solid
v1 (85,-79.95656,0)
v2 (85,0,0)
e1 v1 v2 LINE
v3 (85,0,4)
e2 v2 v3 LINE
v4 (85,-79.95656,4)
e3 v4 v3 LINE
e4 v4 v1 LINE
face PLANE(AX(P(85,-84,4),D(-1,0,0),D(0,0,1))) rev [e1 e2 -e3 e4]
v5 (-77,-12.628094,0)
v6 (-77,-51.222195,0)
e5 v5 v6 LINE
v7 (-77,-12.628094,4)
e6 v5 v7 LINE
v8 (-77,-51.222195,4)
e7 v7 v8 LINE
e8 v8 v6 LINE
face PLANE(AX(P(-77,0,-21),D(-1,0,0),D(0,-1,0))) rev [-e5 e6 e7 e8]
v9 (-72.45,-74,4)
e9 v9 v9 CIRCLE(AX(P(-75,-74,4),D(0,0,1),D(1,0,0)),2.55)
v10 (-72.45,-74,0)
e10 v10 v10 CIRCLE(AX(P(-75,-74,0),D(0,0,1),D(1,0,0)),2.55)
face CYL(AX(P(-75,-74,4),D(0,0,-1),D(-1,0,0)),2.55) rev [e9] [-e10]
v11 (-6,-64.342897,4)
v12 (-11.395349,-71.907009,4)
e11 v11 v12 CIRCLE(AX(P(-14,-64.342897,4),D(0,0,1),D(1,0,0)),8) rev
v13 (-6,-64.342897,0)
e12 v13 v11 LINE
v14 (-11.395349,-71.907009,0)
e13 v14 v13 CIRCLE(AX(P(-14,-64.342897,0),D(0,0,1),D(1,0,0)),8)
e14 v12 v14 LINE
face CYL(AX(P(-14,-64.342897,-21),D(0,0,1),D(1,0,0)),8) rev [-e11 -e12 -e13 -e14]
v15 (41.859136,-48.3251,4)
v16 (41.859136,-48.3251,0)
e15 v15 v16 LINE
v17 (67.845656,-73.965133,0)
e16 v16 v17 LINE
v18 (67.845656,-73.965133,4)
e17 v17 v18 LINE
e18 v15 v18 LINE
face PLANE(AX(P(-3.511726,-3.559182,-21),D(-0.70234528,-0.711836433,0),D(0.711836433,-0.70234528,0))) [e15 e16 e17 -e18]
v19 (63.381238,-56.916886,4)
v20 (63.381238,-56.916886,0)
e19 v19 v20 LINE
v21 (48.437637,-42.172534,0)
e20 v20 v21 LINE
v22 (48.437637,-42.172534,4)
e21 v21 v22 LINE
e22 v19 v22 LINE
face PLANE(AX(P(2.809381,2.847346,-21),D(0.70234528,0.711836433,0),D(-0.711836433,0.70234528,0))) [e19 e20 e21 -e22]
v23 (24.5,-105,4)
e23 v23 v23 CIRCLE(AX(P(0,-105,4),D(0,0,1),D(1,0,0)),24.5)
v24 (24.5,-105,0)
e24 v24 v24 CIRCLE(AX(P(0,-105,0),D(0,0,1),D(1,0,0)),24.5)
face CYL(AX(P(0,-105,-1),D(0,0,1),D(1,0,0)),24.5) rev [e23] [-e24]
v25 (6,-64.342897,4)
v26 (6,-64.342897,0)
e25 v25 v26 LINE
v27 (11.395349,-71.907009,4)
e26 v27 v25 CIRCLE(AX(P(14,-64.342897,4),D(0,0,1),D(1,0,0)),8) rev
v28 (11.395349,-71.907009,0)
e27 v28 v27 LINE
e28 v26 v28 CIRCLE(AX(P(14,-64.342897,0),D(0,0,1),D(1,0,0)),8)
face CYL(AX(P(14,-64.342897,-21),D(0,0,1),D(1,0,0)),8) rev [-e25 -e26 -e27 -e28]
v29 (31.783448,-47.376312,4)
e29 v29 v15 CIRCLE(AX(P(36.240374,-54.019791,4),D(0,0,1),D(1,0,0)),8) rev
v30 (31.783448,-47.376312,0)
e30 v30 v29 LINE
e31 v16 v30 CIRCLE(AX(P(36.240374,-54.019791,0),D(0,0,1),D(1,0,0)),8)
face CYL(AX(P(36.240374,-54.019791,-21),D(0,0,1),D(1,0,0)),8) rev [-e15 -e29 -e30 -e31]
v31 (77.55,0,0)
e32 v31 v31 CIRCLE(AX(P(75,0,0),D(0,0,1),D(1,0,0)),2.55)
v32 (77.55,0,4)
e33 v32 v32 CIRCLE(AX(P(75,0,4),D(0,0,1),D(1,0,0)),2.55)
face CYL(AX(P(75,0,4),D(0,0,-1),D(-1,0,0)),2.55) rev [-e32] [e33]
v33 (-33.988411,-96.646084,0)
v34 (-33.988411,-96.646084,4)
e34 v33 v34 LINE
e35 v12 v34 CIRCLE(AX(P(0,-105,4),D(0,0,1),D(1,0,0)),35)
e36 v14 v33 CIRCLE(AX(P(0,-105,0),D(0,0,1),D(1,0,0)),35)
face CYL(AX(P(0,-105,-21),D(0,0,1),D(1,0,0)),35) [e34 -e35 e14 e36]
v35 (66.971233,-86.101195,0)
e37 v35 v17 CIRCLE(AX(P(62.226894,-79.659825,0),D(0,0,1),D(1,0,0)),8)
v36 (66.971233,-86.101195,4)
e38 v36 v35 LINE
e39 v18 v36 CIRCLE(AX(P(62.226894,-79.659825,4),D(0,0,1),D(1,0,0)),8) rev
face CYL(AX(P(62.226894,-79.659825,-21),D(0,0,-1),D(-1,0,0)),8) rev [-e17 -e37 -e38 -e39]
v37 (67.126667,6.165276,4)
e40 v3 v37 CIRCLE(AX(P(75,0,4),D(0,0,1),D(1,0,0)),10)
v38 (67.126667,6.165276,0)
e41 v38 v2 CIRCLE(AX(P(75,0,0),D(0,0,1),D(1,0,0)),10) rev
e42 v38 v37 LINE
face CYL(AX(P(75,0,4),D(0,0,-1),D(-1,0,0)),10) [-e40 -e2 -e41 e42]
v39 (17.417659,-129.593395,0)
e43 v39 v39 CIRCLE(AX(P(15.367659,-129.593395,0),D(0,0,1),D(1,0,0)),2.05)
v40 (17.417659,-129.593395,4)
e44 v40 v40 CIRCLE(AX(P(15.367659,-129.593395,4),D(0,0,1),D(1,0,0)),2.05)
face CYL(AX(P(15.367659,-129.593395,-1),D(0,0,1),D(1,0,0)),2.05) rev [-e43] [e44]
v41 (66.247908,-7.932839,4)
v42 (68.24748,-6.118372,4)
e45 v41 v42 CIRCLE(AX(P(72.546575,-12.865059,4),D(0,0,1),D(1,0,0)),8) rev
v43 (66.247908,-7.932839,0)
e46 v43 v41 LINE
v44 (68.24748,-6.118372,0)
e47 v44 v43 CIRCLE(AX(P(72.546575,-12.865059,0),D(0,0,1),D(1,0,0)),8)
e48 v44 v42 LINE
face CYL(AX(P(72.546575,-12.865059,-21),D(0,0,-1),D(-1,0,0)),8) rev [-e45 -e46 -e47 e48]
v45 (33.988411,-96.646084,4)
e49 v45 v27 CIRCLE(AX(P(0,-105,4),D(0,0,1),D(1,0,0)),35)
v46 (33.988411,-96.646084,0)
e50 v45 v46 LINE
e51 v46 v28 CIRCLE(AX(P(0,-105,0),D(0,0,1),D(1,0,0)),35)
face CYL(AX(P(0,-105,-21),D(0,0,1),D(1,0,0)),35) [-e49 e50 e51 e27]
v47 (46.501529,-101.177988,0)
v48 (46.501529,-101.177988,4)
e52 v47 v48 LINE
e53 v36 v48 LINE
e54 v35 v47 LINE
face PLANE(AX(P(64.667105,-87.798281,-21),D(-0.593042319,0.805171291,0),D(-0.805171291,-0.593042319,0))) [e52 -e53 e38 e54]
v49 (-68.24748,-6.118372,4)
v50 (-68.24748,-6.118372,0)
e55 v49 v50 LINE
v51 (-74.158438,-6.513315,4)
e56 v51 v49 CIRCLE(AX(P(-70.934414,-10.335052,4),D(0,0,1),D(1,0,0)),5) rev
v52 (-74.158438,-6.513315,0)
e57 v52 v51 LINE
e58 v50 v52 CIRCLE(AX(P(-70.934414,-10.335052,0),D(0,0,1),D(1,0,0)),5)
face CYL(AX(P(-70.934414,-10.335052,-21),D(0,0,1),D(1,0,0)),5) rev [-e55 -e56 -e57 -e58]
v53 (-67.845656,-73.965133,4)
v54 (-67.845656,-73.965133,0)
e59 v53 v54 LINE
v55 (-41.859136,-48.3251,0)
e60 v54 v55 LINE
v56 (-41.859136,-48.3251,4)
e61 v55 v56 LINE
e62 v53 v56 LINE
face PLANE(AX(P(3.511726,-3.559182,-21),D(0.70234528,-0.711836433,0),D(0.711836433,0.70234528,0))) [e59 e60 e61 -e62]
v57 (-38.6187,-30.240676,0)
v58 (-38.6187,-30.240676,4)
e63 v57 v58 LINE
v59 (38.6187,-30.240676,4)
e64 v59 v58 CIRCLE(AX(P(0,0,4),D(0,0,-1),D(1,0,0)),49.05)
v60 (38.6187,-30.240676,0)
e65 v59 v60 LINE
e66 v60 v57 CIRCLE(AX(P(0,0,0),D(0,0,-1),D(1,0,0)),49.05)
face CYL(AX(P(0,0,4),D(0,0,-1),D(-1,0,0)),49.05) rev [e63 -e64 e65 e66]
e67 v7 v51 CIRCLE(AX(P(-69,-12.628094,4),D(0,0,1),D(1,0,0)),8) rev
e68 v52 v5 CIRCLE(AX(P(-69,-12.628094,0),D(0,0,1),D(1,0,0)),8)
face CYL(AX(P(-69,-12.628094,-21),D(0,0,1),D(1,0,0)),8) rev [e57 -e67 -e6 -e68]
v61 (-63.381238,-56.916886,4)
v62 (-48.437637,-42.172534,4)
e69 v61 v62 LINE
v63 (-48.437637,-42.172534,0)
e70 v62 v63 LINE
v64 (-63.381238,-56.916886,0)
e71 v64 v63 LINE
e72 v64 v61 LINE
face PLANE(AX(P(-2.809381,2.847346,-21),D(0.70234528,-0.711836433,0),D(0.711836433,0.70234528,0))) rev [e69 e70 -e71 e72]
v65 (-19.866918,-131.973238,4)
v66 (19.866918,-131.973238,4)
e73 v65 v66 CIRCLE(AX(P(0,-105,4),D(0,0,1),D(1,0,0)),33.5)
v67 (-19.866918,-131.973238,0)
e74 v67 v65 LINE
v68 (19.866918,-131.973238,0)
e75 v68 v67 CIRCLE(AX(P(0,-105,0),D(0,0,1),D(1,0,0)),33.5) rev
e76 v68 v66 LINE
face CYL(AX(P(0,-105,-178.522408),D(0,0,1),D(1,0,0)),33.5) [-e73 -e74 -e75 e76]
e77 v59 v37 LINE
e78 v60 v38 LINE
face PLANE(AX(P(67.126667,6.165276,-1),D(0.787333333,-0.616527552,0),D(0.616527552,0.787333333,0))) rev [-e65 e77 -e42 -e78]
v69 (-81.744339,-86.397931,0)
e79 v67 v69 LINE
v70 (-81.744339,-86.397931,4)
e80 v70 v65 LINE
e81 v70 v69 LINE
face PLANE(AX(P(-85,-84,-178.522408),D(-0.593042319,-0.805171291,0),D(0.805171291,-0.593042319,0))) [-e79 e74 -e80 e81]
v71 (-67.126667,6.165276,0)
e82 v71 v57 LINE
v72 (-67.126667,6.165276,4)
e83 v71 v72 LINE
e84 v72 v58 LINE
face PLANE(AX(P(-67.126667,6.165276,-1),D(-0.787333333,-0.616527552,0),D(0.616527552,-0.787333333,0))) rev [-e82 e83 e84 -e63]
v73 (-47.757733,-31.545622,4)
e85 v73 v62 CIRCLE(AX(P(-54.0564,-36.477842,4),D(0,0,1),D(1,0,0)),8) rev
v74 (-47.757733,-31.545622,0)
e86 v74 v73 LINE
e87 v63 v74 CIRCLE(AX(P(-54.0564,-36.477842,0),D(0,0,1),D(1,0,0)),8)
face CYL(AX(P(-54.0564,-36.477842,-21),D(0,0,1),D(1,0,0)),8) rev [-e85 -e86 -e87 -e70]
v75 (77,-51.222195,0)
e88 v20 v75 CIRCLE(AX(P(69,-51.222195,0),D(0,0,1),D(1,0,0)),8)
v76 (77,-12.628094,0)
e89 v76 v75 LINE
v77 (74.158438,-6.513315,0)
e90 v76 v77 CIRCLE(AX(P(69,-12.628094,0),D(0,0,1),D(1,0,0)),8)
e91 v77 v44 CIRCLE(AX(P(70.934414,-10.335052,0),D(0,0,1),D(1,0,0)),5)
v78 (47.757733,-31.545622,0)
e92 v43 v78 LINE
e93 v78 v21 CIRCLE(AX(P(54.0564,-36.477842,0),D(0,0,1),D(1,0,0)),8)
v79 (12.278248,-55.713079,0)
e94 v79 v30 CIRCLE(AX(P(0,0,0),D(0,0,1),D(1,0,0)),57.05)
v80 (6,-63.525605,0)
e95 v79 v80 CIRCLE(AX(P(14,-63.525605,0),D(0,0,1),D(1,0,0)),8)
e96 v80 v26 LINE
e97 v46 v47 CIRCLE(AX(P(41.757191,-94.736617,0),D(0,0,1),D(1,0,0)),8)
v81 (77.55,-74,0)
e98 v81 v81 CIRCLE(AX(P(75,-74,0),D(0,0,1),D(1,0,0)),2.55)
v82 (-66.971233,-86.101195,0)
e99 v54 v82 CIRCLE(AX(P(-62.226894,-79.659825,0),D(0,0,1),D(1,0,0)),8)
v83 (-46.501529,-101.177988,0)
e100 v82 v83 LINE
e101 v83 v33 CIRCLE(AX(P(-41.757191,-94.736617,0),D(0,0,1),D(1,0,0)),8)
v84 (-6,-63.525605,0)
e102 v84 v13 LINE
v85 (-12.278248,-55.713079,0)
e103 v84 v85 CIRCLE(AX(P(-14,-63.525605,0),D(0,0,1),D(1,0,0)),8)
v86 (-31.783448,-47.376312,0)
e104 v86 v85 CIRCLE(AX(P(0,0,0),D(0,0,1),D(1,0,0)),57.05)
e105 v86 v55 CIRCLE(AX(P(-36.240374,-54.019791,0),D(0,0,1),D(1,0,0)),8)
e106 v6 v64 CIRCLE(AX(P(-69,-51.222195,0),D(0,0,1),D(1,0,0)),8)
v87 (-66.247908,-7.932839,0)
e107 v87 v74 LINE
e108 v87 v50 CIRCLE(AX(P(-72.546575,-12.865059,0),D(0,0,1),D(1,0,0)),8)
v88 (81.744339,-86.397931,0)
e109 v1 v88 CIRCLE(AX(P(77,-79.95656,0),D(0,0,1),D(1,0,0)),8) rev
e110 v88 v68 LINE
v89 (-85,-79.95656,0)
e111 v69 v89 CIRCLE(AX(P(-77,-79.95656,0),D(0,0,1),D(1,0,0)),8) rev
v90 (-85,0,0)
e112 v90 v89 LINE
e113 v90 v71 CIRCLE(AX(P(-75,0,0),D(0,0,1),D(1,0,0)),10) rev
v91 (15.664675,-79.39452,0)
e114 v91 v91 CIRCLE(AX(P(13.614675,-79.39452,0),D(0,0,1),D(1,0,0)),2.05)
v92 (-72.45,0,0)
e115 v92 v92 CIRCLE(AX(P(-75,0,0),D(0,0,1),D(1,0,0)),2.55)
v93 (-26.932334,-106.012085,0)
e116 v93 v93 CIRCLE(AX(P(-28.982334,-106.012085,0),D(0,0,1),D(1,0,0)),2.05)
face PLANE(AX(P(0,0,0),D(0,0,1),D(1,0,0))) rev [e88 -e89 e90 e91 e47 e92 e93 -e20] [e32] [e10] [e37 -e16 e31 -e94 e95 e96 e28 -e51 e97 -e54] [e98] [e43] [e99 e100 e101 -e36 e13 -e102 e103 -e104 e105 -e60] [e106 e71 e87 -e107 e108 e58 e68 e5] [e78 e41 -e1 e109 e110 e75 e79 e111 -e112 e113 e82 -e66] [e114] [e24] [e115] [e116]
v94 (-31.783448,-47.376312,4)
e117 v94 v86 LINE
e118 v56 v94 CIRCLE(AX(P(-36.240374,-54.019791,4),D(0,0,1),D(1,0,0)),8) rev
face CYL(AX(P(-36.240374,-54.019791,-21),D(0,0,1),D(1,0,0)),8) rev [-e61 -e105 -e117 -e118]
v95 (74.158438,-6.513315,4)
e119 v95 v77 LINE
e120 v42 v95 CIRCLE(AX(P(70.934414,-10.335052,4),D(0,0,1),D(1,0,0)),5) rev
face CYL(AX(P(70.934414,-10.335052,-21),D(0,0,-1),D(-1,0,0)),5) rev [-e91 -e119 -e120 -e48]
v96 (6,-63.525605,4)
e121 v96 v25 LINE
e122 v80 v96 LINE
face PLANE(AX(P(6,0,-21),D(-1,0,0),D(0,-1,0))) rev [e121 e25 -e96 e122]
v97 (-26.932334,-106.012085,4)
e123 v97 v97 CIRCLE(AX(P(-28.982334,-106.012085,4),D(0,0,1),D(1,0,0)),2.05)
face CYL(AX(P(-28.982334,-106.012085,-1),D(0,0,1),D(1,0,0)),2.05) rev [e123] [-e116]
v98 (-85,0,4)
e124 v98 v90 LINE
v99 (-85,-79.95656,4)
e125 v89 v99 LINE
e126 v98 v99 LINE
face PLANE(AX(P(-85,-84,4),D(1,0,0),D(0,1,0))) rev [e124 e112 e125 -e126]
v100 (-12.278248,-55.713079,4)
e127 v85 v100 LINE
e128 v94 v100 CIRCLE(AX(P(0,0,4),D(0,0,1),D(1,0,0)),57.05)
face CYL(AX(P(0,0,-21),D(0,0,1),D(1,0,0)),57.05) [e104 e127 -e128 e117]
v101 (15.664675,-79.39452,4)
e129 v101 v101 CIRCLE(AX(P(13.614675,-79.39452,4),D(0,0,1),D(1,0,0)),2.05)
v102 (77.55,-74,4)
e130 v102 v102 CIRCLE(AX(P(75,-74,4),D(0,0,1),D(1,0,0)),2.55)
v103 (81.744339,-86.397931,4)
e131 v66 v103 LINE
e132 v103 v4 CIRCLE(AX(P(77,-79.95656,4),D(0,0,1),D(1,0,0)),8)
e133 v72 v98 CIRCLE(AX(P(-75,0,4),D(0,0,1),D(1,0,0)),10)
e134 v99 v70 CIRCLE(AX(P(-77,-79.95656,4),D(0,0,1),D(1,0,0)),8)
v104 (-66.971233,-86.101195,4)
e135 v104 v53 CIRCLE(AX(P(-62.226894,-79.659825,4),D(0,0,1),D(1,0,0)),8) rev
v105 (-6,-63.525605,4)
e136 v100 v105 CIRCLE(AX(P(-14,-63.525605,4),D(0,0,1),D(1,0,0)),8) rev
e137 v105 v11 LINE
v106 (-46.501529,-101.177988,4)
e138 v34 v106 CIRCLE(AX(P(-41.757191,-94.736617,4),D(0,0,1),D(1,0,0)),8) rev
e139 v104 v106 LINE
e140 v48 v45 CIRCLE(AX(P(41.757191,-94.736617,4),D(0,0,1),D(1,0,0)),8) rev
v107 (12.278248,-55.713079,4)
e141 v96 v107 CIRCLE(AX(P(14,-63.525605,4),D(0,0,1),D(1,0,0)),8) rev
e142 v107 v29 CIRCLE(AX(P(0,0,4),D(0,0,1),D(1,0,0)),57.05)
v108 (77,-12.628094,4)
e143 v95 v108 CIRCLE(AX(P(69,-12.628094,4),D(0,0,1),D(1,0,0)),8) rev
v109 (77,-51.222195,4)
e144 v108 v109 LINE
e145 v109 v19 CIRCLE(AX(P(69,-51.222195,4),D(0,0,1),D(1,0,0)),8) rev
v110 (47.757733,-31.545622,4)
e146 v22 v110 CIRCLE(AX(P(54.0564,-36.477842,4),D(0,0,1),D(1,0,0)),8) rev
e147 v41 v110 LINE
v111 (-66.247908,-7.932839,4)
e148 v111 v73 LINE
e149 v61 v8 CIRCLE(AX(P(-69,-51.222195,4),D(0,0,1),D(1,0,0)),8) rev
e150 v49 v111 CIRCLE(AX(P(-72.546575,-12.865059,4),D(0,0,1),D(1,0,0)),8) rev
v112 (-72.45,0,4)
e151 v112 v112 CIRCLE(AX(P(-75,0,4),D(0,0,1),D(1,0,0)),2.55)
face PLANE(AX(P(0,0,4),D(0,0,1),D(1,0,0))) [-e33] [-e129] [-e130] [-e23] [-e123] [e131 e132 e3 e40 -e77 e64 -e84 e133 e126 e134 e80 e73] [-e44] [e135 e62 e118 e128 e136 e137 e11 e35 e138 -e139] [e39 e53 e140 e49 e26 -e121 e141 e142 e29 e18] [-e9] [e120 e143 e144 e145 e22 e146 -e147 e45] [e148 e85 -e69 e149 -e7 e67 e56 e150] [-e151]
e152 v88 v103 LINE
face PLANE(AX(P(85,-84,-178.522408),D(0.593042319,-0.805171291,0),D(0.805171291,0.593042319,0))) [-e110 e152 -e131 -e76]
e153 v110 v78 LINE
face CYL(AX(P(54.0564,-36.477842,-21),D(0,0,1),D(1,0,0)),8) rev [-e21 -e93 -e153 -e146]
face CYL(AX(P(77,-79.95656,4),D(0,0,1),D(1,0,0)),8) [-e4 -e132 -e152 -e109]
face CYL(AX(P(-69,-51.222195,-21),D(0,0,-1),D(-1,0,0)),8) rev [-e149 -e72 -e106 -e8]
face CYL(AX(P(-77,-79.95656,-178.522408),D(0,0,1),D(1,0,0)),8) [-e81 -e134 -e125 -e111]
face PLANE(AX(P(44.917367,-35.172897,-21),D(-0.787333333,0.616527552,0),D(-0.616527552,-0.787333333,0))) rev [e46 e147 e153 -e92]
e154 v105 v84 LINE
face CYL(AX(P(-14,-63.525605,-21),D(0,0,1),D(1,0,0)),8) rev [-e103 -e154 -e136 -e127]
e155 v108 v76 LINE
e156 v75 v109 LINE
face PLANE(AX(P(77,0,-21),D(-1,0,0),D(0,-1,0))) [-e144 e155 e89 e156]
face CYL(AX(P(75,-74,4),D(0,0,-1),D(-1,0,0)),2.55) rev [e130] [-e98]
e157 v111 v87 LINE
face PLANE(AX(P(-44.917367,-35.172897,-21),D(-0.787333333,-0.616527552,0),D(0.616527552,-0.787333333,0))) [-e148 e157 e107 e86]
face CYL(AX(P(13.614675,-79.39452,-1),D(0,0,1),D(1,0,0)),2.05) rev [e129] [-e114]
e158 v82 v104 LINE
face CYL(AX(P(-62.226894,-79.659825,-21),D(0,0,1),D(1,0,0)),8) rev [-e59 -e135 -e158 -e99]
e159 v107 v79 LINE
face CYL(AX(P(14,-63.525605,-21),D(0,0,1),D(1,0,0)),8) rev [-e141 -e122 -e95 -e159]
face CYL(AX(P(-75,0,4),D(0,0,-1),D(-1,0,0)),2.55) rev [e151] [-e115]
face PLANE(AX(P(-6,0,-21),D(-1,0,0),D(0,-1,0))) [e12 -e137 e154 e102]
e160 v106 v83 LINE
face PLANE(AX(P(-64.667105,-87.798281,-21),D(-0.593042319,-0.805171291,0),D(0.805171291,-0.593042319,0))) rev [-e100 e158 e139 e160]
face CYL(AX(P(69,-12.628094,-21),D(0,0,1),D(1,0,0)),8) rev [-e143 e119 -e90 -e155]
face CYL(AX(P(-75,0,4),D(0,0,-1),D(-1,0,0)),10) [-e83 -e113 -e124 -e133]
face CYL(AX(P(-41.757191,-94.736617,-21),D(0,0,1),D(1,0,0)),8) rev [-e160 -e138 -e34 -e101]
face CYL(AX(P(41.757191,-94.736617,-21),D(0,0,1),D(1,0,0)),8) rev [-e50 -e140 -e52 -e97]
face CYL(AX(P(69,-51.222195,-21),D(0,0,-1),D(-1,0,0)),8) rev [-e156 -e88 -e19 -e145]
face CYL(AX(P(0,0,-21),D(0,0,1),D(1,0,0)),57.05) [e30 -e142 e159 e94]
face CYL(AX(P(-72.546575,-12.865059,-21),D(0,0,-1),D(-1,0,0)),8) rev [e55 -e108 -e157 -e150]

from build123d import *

# Parameters (mm, degrees)
SKETCH_1_R          = 2.55
EXTRUDE_1_DEPTH     = 4
EXTRUDE_2_DEPTH     = 4
FILLET_2_R          = 10
SKETCH_5_R          = 2.05
SKETCH_5_R_2        = 24.5
CUT_EXTRUDE_1_DEPTH = 5
CUT_EXTRUDE_2_DEPTH = 5
CUT_EXTRUDE_3_DEPTH = 25
FILLET_3_R          = 8
FILLET_4_R          = 5


with BuildPart() as part:
    # 草图1 → 凸台-拉伸1 (new body)
    with BuildSketch(Plane.XY):
        with BuildLine():
            Line((-85, -84), (85, -84))
            Line((85, -84), (85, 10))
            Line((85, 10), (48.019813619, 10))
            ThreePointArc((48.019813619, 10), (0, -49.05), (-48.019813619, 10))
            Line((-48.019813619, 10), (-85, 10))
            Line((-85, 10), (-85, -84))
        make_face()
        with Locations((75, 0)):
            Circle(SKETCH_1_R, mode=Mode.SUBTRACT)
        with Locations((-75, 0)):
            Circle(SKETCH_1_R, mode=Mode.SUBTRACT)
        with Locations((-75, -74)):
            Circle(SKETCH_1_R, mode=Mode.SUBTRACT)
        with Locations((75, -74)):
            Circle(SKETCH_1_R, mode=Mode.SUBTRACT)
    extrude(amount=EXTRUDE_1_DEPTH)

    # 草图2 → 凸台-拉伸2 (add)
    with BuildSketch(Plane.XY.offset(4)):
        with BuildLine():
            Line((-85, -84), (-19.866917685, -131.97323825))
            ThreePointArc((-19.866917685, -131.97323825), (0, -138.5), (19.866917685, -131.97323825))
            Line((19.866917685, -131.97323825), (85, -84))
            Line((85, -84), (-85, -84))
        make_face()
    extrude(amount=-EXTRUDE_2_DEPTH)

    # 圆角2
    fillet_2_edges = [part.edges().sort_by_distance(p)[0] for p in [
        (85, 10, 2),
        (-85, 10, 2),
    ]]
    fillet(fillet_2_edges, radius=FILLET_2_R)

    # 草图5 → 切除-拉伸1 (cut)
    with BuildSketch(Plane.XY.offset(4)):
        with Locations((15.367658663, -129.593394789)):
            Circle(SKETCH_5_R)
        with Locations((-28.982333984, -106.012085404)):
            Circle(SKETCH_5_R)
        with Locations((13.614675321, -79.394519807)):
            Circle(SKETCH_5_R)
        with Locations((0, -105)):
            Circle(SKETCH_5_R_2)
    extrude(amount=-CUT_EXTRUDE_1_DEPTH, mode=Mode.SUBTRACT)

    # 草图6 → 切除-拉伸2 (cut)
    with BuildSketch(Plane.XY.offset(4)):
        with BuildLine():
            Line((-67.126666667, 6.165275519), (-38.6187, -30.24067642))
            Line((-38.6187, -30.24067642), (38.6187, -30.24067642))
            Line((38.6187, -30.24067642), (67.126666667, 6.165275519))
            ThreePointArc((67.126666667, 6.165275519), (70.621230492, 8.990349136), (75, 10))
            Line((75, 10), (-75, 10))
            ThreePointArc((-75, 10), (-70.621230492, 8.990349136), (-67.126666667, 6.165275519))
        make_face()
    extrude(amount=-CUT_EXTRUDE_2_DEPTH, mode=Mode.SUBTRACT)

    # 草图7 → 切除-拉伸3 (cut)
    with BuildSketch(Plane.XY.offset(4)):
        Polygon((-77, -5.144778907), (-68.857155974, -4.600712255), (-43.359613768, -37.162217147), (-77, -70.354064895), align=None)
        with BuildLine():
            ThreePointArc((-36.942273764, -43.473795661), (-22.471434931, -52.437935811), (-6, -56.733609968))
            Line((-6, -56.733609968), (-6, -70.518120701))
            ThreePointArc((-6, -70.518120701), (-28.302069217, -84.408912655), (-34.654792832, -109.903604165))
            Line((-34.654792832, -109.903604165), (-74.514618659, -80.545175958))
            Line((-74.514618659, -80.545175958), (-36.942273764, -43.473795661))
        make_face()
        with BuildLine():
            ThreePointArc((34.654792832, -109.903604165), (28.302069217, -84.408912655), (6, -70.518120701))
            Line((6, -70.518120701), (6, -56.733609968))
            ThreePointArc((6, -56.733609968), (22.471434931, -52.437935811), (36.942273764, -43.473795661))
            Line((36.942273764, -43.473795661), (74.514618659, -80.545175958))
            Line((74.514618659, -80.545175958), (34.654792832, -109.903604165))
        make_face()
        Polygon((77, -70.354064895), (43.359613768, -37.162217147), (68.857155974, -4.600712255), (77, -5.144778907), align=None)
    extrude(amount=-CUT_EXTRUDE_3_DEPTH, mode=Mode.SUBTRACT)

    # 圆角3
    # the kernel refuses this fillet: 8 mm, written as the material it adds along each edge
    with BuildSketch(Plane(origin=(-6, -56.733609968, 4), x_dir=(0, -1, 0), z_dir=(0, 0, -1))) as fillet_3_piece_1:
        with BuildLine():
            CenterArc((6.791995106, 8), FILLET_3_R, 192.428379519, 77.571620481)
            ThreePointArc((-1.020531268, 6.278247502), (-0.422700314, 3.153357523), (0, 0))
            Line((0, 0), (6.791995106, 0))
        make_face()
    extrude(amount=4)
    with BuildSketch(Plane(origin=(-6, -70.518120701, 4), x_dir=(-0.9684273836136271, -0.2492958135774943, 0), z_dir=(0, 0, -1))) as fillet_3_piece_2:
        with BuildLine():
            CenterArc((6.207961727, 7.97462195), FILLET_3_R, 194.435845985, 70.999197637)
            Line((-1.539457342, 5.980255442), (0, 0))
            ThreePointArc((0, 0), (2.785623852, 0.111028967), (5.571247704, 0))
        make_face()
    extrude(amount=4)
    with BuildSketch(Plane(origin=(-34.654792832, -109.903604165, 4), x_dir=(-0.8051712910421941, 0.5930423189633656, 0), z_dir=(0, 0, -1))) as fillet_3_piece_3:
        with BuildLine():
            CenterArc((14.713311973, 8), FILLET_3_R, 157.435643024, 112.564356976)
            ThreePointArc((7.325719141, 11.069767442), (4.192460552, 5.184405893), (0, 0))
            Line((0, 0), (14.713311973, 0))
        make_face()
    extrude(amount=4)
    with BuildSketch(Plane(origin=(-74.514618659, -80.545175958, 4), x_dir=(0.711836432832338, 0.7023452803945736, 0), z_dir=(0, 0, -1)), Plane(origin=(74.514618659, -80.545175958, 4), x_dir=(-0.8051712910421942, -0.5930423189633655, 0), z_dir=(0, 0, -1))) as fillet_3_piece_4:
        with BuildLine():
            CenterArc((FILLET_3_R * 1.17108402506, FILLET_3_R), FILLET_3_R, 170.988669267, 99.011330733)
            Line((FILLET_3_R * 0.183426640042, FILLET_3_R * 1.15662978584), (0, 0))
            Line((0, 0), (FILLET_3_R * 1.17108402506, 0))
        make_face()
    extrude(amount=4)
    with BuildSketch(Plane(origin=(-36.942273764, -43.473795661, 4), x_dir=(-0.711836432832338, -0.7023452803945739, 0), z_dir=(0, 0, -1))) as fillet_3_piece_5:
        with BuildLine():
            CenterArc((6.907291952, -8), FILLET_3_R, 90, 78.47203041)
            ThreePointArc((-0.931326161, -6.401229823), (-0.374864481, -3.213825359), (0, 0))
            Line((0, 0), (6.907291952, 0))
        make_face()
    extrude(amount=4)
    with BuildSketch(Plane(origin=(43.359613768, -37.162217147, 4), x_dir=(0.616527551876007, 0.7873333333333332, 0), z_dir=(0, 0, -1)), Plane(origin=(-43.359613768, -37.162217147, 4), x_dir=(-0.7118364328323388, -0.7023452803945729, 0), z_dir=(0, 0, -1))) as fillet_3_piece_6:
        with BuildLine():
            CenterArc((FILLET_3_R * 0.891711791031, FILLET_3_R), FILLET_3_R, 186.552471372, 83.447528628)
            Line((-FILLET_3_R * 0.101755976712, FILLET_3_R * 0.885886922506), (0, 0))
            Line((0, 0), (FILLET_3_R * 0.891711791031, 0))
        make_face()
    extrude(amount=4)
    with BuildSketch(Plane(origin=(68.857155974, -4.600712255, 4), x_dir=(0.9977753031397176, -0.06666666666666672, 0), z_dir=(0, 0, -1)), Plane(origin=(-68.857155974, -4.600712255, 4), x_dir=(0.6165275518760065, -0.7873333333333337, 0), z_dir=(0, 0, -1))) as fillet_3_piece_7:
        with BuildLine():
            CenterArc((FILLET_3_R * 0.529020931448, FILLET_3_R), FILLET_3_R, 214.240445239, 55.759554761)
            Line((-FILLET_3_R * 0.297662660682, FILLET_3_R * 0.437332923922), (0, 0))
            Line((0, 0), (FILLET_3_R * 0.529020931448, 0))
        make_face()
    extrude(amount=4)
    with BuildSketch(Plane(origin=(77, -5.144778907, 4), x_dir=(0, -1, 0), z_dir=(0, 0, -1))) as fillet_3_piece_8:
        with BuildLine():
            CenterArc((FILLET_3_R * 0.935414346693, FILLET_3_R), FILLET_3_R, 183.822553729, 86.177446271)
            Line((-FILLET_3_R * 0.0623609564462, FILLET_3_R * 0.933333333333), (0, 0))
            Line((0, 0), (FILLET_3_R * 0.935414346693, 0))
        make_face()
    extrude(amount=4)
    with BuildSketch(Plane(origin=(77, -70.354064895, 4), x_dir=(0, 1, 0), z_dir=(0, 0, -1))) as fillet_3_piece_9:
        with BuildLine():
            CenterArc((FILLET_3_R * 2.39148377615, -FILLET_3_R), FILLET_3_R, 90, 134.61547034)
            Line((FILLET_3_R * 1.67964734332, -FILLET_3_R * 1.70234528039), (0, 0))
            Line((0, 0), (FILLET_3_R * 2.39148377615, 0))
        make_face()
    extrude(amount=4)
    with BuildSketch(Plane(origin=(-77, -70.354064895, 4), x_dir=(0, 1, 0), z_dir=(0, 0, -1))) as fillet_3_piece_10:
        with BuildLine():
            CenterArc((FILLET_3_R * 2.39148377615, FILLET_3_R), FILLET_3_R, 135.38452966, 134.61547034)
            Line((FILLET_3_R * 1.67964734332, FILLET_3_R * 1.70234528039), (0, 0))
            Line((0, 0), (FILLET_3_R * 2.39148377615, 0))
        make_face()
    extrude(amount=4)
    with BuildSketch(Plane(origin=(-77, -5.144778907, 4), x_dir=(0, -1, 0), z_dir=(0, 0, -1))) as fillet_3_piece_11:
        with BuildLine():
            CenterArc((FILLET_3_R * 0.935414346693, -FILLET_3_R), FILLET_3_R, 90, 86.177446271)
            Line((-FILLET_3_R * 0.0623609564462, -FILLET_3_R * 0.933333333333), (0, 0))
            Line((0, 0), (FILLET_3_R * 0.935414346693, 0))
        make_face()
    extrude(amount=4)
    with BuildSketch(Plane(origin=(6, -56.733609968, 4), x_dir=(0.9870448668515611, 0.16044447893892722, 0), z_dir=(0, 0, -1))) as fillet_3_piece_12:
        with BuildLine():
            CenterArc((6.806620819, 7.987559736), FILLET_3_R, 189.232696301, 77.571620481)
            Line((-1.089738116, 6.704003905), (0, 0))
            ThreePointArc((0, 0), (3.180325289, 0.08871463), (6.360650577, 0))
        make_face()
    extrude(amount=4)
    with BuildSketch(Plane(origin=(36.942273764, -43.473795661, 4), x_dir=(0.7118364328323379, -0.7023452803945738, 0), z_dir=(0, 0, -1))) as fillet_3_piece_13:
        with BuildLine():
            CenterArc((6.907291952, 8), FILLET_3_R, 191.52796959, 78.47203041)
            ThreePointArc((-0.931326161, 6.401229823), (-0.374864481, 3.213825359), (0, 0))
            Line((0, 0), (6.907291952, 0))
        make_face()
    extrude(amount=4)
    with BuildSketch(Plane(origin=(6, -70.518120701, 4), x_dir=(0, 1, 0), z_dir=(0, 0, -1))) as fillet_3_piece_14:
        with BuildLine():
            CenterArc((6.175223401, 8), FILLET_3_R, 199.000802363, 70.999197637)
            ThreePointArc((-1.388888729, 5.395348837), (-0.586920873, 2.725353475), (0, 0))
            Line((0, 0), (6.175223401, 0))
        make_face()
    extrude(amount=4)
    with BuildSketch(Plane(origin=(34.654792832, -109.903604165, 4), x_dir=(0.8051712910421941, 0.5930423189633658, 0), z_dir=(0, 0, -1))) as fillet_3_piece_15:
        with BuildLine():
            CenterArc((14.713311973, -8), FILLET_3_R, 90, 112.564356976)
            ThreePointArc((7.325719141, -11.069767442), (4.192460552, -5.184405893), (0, 0))
            Line((0, 0), (14.713311973, 0))
        make_face()
    extrude(amount=4)
    # the kernel refuses this fillet: 8 mm, written as the material it takes off along each edge
    with BuildSketch(Plane(origin=(-85, -84, -10.108598892), x_dir=(0, 1, 0), z_dir=(0, 0, 1))) as fillet_3_2_piece_1:
        with BuildLine():
            CenterArc((FILLET_3_R * 0.505429944614, -FILLET_3_R), FILLET_3_R, 90, 53.626801073)
            Line((-FILLET_3_R * 0.299741346428, -FILLET_3_R * 0.406957681037), (0, 0))
            Line((0, 0), (FILLET_3_R * 0.505429944614, 0))
        make_face()
    extrude(amount=24.217197785, mode=Mode.SUBTRACT)
    with BuildSketch(Plane(origin=(85, -84, -10.108598892), x_dir=(0, 1, 0), z_dir=(0, 0, 1))) as fillet_3_2_piece_2:
        with BuildLine():
            CenterArc((FILLET_3_R * 0.505429944614, FILLET_3_R), FILLET_3_R, 216.373198927, 53.626801073)
            Line((-FILLET_3_R * 0.299741346428, FILLET_3_R * 0.406957681037), (0, 0))
            Line((0, 0), (FILLET_3_R * 0.505429944614, 0))
        make_face()
    extrude(amount=24.217197785, mode=Mode.SUBTRACT)

    # 圆角4
    fillet_4_edges = [part.edges().sort_by_distance(p)[0] for p in [
        (71.293293442, -4.963838649, 2),
        (-71.293293442, -4.963838649, 2),
    ]]
    fillet(fillet_4_edges, radius=FILLET_4_R)


solid = part.part
